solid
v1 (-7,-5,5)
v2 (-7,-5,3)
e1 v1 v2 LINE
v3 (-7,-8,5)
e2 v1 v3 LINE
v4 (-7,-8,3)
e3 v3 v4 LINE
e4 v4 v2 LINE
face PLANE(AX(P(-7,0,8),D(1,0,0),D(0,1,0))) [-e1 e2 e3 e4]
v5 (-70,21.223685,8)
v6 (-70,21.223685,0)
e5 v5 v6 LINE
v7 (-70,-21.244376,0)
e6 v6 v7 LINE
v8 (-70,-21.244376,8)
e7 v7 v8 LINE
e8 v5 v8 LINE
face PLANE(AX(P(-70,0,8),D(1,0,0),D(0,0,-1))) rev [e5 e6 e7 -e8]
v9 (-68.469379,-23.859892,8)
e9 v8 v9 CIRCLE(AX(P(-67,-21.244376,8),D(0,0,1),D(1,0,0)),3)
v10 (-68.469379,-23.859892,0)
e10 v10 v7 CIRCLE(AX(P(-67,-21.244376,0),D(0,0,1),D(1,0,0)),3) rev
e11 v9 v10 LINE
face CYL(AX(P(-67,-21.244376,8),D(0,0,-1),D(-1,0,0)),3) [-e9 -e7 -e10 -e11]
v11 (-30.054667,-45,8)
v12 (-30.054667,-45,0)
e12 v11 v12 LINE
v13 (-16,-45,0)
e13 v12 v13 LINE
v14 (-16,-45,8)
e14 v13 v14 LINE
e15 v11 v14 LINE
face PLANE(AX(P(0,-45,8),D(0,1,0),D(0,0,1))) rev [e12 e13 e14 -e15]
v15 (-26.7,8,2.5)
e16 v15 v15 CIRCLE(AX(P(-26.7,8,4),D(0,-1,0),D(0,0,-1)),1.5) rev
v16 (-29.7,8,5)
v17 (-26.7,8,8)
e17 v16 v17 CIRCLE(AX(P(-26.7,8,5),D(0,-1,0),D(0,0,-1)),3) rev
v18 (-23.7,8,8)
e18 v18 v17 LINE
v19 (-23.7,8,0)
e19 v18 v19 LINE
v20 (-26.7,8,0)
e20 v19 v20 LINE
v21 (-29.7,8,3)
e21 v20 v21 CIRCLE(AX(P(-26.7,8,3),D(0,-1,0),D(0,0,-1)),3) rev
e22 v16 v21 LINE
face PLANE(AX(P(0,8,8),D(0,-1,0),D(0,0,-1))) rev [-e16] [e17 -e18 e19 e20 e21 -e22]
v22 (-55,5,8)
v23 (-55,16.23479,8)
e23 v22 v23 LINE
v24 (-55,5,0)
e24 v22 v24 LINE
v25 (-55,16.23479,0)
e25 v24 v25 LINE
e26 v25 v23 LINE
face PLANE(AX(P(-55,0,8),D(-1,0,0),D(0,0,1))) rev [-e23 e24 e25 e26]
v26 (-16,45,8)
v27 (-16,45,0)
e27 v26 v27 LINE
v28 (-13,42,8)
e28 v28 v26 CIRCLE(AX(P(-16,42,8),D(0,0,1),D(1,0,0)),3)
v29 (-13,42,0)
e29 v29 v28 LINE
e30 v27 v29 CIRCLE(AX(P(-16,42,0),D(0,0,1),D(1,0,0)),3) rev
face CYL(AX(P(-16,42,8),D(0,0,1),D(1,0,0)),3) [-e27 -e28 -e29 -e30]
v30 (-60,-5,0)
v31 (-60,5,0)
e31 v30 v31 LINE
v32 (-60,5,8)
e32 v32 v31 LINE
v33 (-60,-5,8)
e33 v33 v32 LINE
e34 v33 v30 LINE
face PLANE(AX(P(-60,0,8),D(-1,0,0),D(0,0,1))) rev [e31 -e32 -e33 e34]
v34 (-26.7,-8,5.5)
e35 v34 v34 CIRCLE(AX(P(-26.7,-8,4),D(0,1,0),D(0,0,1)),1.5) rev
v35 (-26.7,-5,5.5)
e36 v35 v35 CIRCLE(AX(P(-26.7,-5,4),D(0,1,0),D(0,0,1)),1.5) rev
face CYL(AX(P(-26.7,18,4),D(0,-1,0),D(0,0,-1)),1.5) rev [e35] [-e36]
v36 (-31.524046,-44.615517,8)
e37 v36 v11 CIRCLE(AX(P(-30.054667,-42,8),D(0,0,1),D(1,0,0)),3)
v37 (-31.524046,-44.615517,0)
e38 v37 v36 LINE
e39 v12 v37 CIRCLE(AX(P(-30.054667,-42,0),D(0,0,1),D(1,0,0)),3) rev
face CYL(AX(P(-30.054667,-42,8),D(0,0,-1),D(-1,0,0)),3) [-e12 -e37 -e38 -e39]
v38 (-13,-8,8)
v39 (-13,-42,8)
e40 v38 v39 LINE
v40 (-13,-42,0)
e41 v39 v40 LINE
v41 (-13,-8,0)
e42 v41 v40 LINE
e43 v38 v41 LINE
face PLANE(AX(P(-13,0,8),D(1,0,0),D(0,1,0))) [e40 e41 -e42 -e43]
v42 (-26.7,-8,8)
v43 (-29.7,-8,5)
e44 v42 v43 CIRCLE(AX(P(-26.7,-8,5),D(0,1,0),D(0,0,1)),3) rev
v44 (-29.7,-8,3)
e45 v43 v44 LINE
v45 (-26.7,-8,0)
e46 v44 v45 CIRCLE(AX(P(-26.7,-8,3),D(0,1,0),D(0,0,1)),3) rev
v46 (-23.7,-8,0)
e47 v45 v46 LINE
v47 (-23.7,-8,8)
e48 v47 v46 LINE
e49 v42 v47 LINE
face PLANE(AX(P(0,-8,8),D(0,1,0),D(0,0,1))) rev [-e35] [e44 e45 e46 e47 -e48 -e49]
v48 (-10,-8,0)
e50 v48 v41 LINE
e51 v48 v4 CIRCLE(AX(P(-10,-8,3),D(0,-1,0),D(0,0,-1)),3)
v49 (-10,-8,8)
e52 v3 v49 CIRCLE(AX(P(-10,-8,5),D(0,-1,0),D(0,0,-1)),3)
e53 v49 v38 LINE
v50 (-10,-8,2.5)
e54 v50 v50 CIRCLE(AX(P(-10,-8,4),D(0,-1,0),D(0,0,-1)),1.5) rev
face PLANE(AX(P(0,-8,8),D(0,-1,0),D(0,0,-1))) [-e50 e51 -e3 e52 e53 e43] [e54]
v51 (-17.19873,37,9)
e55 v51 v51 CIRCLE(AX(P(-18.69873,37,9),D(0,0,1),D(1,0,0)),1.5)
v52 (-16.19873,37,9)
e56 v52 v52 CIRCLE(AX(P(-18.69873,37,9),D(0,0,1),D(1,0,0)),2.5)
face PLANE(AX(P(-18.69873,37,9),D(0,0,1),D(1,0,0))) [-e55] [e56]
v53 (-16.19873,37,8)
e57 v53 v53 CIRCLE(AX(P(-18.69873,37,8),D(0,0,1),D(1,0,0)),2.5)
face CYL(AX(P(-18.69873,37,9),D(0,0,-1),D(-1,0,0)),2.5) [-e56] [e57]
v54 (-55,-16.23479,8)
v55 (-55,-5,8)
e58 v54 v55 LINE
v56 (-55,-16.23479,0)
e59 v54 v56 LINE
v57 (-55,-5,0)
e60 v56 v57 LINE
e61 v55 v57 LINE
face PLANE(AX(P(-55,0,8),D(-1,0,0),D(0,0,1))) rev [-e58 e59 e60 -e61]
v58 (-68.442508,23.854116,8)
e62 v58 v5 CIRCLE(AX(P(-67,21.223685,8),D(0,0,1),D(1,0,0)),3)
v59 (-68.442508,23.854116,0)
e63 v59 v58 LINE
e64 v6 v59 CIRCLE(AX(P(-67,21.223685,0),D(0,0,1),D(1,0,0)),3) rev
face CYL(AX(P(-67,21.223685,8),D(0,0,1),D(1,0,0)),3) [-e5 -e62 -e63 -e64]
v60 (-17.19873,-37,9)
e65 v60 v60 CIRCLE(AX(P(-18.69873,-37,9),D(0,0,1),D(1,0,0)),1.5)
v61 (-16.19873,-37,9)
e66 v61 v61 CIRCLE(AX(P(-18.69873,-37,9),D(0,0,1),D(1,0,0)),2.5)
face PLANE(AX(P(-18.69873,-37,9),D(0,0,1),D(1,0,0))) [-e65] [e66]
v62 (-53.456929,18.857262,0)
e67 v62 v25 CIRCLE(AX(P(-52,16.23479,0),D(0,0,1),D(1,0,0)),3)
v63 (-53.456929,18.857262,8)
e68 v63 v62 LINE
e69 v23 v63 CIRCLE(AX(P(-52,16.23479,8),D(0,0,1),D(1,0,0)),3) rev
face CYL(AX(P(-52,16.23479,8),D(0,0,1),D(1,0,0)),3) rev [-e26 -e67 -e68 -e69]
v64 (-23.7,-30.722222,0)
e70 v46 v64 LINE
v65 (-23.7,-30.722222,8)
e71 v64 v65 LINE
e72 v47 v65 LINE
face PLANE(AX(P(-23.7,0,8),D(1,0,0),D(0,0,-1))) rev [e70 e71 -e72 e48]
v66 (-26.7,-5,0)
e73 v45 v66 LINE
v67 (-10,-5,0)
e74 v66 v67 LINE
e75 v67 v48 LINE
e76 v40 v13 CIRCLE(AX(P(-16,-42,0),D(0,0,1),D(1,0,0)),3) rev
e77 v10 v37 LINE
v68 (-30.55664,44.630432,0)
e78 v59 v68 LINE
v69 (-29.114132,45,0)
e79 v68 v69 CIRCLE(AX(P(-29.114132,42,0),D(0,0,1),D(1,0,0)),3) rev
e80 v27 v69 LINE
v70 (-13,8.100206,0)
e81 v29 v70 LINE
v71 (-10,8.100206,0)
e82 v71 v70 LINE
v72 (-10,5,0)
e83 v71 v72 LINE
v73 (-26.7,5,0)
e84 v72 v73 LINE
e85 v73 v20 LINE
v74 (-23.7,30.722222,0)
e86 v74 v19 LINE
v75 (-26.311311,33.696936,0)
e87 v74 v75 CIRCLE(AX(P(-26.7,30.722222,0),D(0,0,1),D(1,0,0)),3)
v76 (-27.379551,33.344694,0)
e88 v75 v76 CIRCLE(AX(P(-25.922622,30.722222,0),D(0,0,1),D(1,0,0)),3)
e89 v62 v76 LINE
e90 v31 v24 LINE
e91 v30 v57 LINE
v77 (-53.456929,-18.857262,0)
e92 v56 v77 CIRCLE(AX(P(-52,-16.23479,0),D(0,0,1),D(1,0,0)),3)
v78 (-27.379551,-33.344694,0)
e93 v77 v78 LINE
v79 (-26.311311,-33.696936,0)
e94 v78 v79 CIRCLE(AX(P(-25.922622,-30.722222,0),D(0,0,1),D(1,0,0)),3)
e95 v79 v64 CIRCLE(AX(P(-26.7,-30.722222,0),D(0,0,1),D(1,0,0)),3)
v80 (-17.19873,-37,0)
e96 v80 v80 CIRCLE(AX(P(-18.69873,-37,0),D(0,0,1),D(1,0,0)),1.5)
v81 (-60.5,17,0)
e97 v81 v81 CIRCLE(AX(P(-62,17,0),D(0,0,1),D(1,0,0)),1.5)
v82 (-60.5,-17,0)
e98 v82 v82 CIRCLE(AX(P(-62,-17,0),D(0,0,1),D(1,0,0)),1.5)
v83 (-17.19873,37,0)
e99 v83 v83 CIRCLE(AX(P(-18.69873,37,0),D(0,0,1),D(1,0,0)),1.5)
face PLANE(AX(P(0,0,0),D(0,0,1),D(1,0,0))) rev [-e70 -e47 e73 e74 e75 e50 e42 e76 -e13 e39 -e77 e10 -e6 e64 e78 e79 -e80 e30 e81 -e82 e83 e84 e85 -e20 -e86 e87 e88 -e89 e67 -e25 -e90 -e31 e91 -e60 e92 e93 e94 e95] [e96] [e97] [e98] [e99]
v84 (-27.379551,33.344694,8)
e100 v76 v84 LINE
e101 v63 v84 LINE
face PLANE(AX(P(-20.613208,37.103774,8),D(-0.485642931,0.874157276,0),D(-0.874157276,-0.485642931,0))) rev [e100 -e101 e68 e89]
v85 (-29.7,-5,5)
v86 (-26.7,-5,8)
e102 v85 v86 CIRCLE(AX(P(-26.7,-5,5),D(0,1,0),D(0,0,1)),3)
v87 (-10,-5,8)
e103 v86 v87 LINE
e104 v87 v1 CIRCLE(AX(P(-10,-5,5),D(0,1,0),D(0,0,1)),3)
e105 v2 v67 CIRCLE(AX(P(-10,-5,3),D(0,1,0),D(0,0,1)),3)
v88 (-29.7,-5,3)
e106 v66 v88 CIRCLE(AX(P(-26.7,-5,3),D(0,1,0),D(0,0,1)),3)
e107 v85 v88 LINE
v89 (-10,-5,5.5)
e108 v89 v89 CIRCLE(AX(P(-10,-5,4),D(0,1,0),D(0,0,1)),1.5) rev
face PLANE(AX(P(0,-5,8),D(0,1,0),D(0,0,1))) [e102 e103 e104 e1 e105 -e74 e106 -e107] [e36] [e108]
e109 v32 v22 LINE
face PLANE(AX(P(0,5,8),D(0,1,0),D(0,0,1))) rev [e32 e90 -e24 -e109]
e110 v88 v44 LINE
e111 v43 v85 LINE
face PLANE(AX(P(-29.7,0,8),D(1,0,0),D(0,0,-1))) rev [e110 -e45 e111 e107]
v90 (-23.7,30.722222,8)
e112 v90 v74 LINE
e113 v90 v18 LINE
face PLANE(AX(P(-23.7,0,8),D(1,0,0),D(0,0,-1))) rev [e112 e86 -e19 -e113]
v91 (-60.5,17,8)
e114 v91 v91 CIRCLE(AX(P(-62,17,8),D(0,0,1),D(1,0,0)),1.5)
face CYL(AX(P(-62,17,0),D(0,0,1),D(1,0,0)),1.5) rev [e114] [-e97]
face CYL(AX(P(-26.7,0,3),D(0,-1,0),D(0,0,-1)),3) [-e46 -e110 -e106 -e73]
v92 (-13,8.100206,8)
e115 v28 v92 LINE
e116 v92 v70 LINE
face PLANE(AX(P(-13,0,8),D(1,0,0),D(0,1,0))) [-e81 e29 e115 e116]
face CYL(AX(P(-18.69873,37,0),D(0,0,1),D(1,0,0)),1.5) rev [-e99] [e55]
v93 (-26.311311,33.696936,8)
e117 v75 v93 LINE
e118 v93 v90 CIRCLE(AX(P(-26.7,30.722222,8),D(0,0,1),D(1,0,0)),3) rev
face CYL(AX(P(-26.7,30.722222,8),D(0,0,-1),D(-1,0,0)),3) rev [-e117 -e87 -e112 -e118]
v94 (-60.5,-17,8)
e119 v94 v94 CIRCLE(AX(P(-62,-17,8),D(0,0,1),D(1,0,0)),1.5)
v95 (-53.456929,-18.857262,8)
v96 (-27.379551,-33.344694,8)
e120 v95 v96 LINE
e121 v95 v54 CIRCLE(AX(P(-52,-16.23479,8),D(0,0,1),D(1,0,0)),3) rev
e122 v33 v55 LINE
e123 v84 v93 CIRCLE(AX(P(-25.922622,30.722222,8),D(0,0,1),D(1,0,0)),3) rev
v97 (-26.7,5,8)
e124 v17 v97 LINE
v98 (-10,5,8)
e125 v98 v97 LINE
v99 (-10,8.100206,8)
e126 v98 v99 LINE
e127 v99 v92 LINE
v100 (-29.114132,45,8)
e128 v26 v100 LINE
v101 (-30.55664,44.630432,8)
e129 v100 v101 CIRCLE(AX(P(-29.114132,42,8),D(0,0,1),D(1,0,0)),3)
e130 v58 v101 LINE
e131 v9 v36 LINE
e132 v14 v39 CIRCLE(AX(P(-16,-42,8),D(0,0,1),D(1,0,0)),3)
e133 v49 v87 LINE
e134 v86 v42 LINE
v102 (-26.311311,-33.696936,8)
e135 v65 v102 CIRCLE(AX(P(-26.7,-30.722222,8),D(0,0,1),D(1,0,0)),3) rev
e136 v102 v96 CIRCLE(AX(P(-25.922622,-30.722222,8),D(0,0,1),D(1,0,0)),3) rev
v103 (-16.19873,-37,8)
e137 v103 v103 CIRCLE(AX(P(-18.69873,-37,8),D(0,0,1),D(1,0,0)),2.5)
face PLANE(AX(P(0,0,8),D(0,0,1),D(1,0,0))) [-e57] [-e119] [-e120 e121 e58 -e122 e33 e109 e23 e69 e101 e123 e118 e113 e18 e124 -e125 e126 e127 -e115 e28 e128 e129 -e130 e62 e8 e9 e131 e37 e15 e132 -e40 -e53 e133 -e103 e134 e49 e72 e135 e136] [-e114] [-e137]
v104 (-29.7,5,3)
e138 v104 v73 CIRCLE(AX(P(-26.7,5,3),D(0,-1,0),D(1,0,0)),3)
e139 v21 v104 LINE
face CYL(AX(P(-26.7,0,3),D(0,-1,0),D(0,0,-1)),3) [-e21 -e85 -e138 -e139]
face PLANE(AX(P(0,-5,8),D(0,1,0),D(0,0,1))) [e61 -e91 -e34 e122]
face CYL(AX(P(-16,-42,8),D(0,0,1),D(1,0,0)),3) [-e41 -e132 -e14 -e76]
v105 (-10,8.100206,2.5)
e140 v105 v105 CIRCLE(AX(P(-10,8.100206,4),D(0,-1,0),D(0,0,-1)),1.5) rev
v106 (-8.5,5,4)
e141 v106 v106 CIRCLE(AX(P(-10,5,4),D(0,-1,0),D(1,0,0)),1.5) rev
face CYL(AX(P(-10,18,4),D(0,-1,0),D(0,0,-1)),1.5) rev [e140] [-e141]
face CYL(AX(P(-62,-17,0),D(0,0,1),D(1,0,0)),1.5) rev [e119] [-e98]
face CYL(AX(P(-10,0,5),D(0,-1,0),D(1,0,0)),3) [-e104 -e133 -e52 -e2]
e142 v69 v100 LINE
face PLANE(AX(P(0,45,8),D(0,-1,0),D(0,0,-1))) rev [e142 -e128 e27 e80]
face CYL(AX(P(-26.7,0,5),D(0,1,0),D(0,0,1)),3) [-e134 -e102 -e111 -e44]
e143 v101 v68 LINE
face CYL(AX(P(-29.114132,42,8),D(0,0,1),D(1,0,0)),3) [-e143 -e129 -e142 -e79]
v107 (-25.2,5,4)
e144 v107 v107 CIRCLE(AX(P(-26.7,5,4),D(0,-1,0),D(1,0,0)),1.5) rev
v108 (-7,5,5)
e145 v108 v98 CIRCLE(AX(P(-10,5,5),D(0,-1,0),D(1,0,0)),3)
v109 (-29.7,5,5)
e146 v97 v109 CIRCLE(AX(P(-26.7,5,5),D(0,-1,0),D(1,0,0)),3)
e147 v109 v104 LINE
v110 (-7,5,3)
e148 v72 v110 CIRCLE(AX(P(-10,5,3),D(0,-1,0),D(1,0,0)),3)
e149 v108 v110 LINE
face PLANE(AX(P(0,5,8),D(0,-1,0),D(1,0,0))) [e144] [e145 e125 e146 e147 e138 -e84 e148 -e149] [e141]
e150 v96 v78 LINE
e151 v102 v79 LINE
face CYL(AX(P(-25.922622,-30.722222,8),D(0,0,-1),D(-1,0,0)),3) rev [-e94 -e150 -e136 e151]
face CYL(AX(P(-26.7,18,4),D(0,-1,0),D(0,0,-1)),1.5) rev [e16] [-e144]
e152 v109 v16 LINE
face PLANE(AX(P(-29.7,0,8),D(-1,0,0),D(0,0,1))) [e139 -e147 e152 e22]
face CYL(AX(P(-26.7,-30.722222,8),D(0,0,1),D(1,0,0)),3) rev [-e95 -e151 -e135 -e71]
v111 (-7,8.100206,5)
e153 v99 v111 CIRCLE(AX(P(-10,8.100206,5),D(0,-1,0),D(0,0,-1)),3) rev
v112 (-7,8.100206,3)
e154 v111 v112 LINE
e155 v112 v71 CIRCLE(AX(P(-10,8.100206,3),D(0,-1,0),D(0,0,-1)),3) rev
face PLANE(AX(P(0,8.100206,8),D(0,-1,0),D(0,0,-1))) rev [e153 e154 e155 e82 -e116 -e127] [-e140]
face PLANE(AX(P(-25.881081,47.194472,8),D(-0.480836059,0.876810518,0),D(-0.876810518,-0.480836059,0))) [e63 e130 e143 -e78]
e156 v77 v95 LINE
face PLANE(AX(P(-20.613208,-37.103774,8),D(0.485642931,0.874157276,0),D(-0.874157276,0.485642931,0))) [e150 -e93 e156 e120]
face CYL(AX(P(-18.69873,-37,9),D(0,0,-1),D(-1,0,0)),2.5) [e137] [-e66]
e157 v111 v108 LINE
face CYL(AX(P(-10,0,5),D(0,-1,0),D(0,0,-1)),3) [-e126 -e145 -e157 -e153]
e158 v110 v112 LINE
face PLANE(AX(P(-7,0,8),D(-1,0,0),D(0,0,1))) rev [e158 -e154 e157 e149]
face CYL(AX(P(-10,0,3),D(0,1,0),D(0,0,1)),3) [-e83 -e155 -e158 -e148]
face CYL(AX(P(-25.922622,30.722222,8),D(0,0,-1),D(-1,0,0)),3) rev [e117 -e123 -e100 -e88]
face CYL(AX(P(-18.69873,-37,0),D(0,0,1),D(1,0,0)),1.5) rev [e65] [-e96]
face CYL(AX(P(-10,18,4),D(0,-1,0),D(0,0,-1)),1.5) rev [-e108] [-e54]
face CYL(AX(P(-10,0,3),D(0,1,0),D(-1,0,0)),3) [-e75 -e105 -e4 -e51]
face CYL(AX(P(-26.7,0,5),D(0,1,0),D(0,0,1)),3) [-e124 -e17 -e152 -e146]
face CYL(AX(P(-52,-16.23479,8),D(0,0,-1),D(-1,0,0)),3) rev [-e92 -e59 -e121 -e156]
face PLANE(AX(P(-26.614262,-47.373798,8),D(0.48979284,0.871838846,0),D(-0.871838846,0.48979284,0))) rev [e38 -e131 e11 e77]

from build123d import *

# Parameters (mm, degrees)
EXTRUDE_1_DEPTH          = 8
SKETCH_2_R               = 1.5
CUT_EXTRUDE_1_DEPTH      = 84.600239234
EXTRUDE_START            = 1
SKETCH_7_R               = 2.5
SKETCH_7_R_2             = 1.5
EXTRUDE_5_DEPTH          = 1
CUT_EXTRUDE_2_DEPTH      = 10
CUT_EXTRUDE_2_DEPTH_BACK = 20
SKETCH_8_R               = 1.5
FILLET_1_R               = 3
FILLET_2_R               = 3


with BuildPart() as part:
    # 草图1 → 凸台-拉伸1 (new body)
    with BuildSketch(Plane.XY):
        Polygon((-29.882727096, 45), (-70, 23), (-70, 5), (-70, -5), (-70, -23), (-30.839658999, -45), (-13, -45), (-13, -8), (-7, -8), (-7, -5), (-13.8744125, -5), (-23.7, -5), (-29.7, -5), (-29.7, -8), (-23.7, -8), (-23.7, -33.722222222), (-26.7, -33.722222222), (-55, -18), (-55, -10), (-55, -5), (-60, -5), (-60, 5), (-55, 5), (-55, 10), (-55, 18), (-26.7, 33.722222222), (-23.7, 33.722222222), (-23.7, 8), (-29.7, 8), (-29.7, 5), (-23.7, 5), (-13.8744125, 5), (-7, 5), (-7, 8.100206116), (-13, 8.100206116), (-13, 45), (-13.841189827, 45), align=None)
    extrude(amount=EXTRUDE_1_DEPTH)

    # 草图2 → 切除-拉伸1 (cut, through all)
    with BuildSketch(Plane.XY.offset(8)):
        with Locations((-62, 17)):
            Circle(SKETCH_2_R)
        with Locations((-62, -17)):
            Circle(SKETCH_2_R)
        with Locations((-18.698729811, 37)):
            Circle(SKETCH_2_R)
        with Locations((-18.698729811, -37)):
            Circle(SKETCH_2_R)
    extrude(amount=-CUT_EXTRUDE_1_DEPTH, mode=Mode.SUBTRACT)

    # 草图7 → 凸台-拉伸5 (add)
    # profile 1 of 2: a face of its own
    with BuildSketch(Plane.XY.offset(8).offset(EXTRUDE_START)):
        with Locations((-18.698729811, 37)):
            Circle(SKETCH_7_R)
        with Locations((-18.698729811, 37)):
            Circle(SKETCH_7_R_2, mode=Mode.SUBTRACT)
    # profile 2 of 2: a face of its own
    with BuildSketch(Plane.XY.offset(8).offset(EXTRUDE_START)):
        with Locations((-18.698729811, -37)):
            Circle(SKETCH_7_R)
        with Locations((-18.698729811, -37)):
            Circle(SKETCH_7_R_2, mode=Mode.SUBTRACT)
    extrude(amount=-EXTRUDE_5_DEPTH)

    # 草图8 → 切除-拉伸2 (cut, two sides: drawn at the far end of the back side and taken through both)
    with BuildSketch(Plane(origin=(0, 8, 0), x_dir=(1, 0, 0), z_dir=(0, 1, 0)).offset(-CUT_EXTRUDE_2_DEPTH_BACK)):
        with Locations(Location((-26.7, -4, 0), (0, 0, 90))):
            Circle(SKETCH_8_R)
        with Locations(Location((-10, -4, 0), (0, 0, 90))):
            Circle(SKETCH_8_R)
    extrude(amount=CUT_EXTRUDE_2_DEPTH + CUT_EXTRUDE_2_DEPTH_BACK, mode=Mode.SUBTRACT)

    # 圆角1
    # the kernel refuses this fillet: 3 mm, written as the material it adds along each edge
    with BuildSketch(Plane(origin=(-55, -18, 0), x_dir=(0.8741572761215378, -0.4856429311786321, 0), z_dir=(0, 0, 1))) as fillet_1_piece_1:
        with BuildLine():
            CenterArc((FILLET_1_R * 0.588403348999, FILLET_1_R), FILLET_1_R, 209.054604099, 60.945395901)
            Line((-FILLET_1_R * 0.285753927123, FILLET_1_R * 0.514357068821), (0, 0))
            Line((0, 0), (FILLET_1_R * 0.588403348999, 0))
        make_face()
    extrude(amount=8)
    with BuildSketch(Plane(origin=(-55, 18, 0), x_dir=(0.8741572761215377, 0.4856429311786323, 0), z_dir=(0, 0, 1))) as fillet_1_piece_2:
        with BuildLine():
            CenterArc((FILLET_1_R * 0.588403348999, -FILLET_1_R), FILLET_1_R, 90, 60.945395901)
            Line((-FILLET_1_R * 0.285753927123, -FILLET_1_R * 0.514357068821), (0, 0))
            Line((0, 0), (FILLET_1_R * 0.588403348999, 0))
        make_face()
    extrude(amount=8)
    with BuildSketch(Plane(origin=(-26.7, -33.722222222, 0), x_dir=(1, 0, 0), z_dir=(0, 0, 1))) as fillet_1_piece_3:
        with BuildLine():
            CenterArc((FILLET_1_R * 0.259126028197, FILLET_1_R), FILLET_1_R, 240.945395901, 29.054604099)
            Line((-FILLET_1_R * 0.226516902981, FILLET_1_R * 0.125842723878), (0, 0))
            Line((0, 0), (FILLET_1_R * 0.259126028197, 0))
        make_face()
    extrude(amount=8)
    with BuildSketch(Plane(origin=(-23.7, -33.722222222, 0), x_dir=(0, 1, 0), z_dir=(0, 0, 1))) as fillet_1_piece_4:
        with BuildLine():
            CenterArc((FILLET_1_R, FILLET_1_R), FILLET_1_R, 180, 90)
            Line((0, FILLET_1_R), (0, 0))
            Line((0, 0), (FILLET_1_R, 0))
        make_face()
    extrude(amount=8)
    with BuildSketch(Plane(origin=(-26.7, 33.722222222, 0), x_dir=(1, 0, 0), z_dir=(0, 0, 1))) as fillet_1_piece_5:
        with BuildLine():
            CenterArc((FILLET_1_R * 0.259126028197, -FILLET_1_R), FILLET_1_R, 90, 29.054604099)
            Line((-FILLET_1_R * 0.226516902981, -FILLET_1_R * 0.125842723878), (0, 0))
            Line((0, 0), (FILLET_1_R * 0.259126028197, 0))
        make_face()
    extrude(amount=8)
    with BuildSketch(Plane(origin=(-23.7, 33.722222222, 0), x_dir=(0, -1, 0), z_dir=(0, 0, 1))) as fillet_1_piece_6:
        with BuildLine():
            CenterArc((FILLET_1_R, -FILLET_1_R), FILLET_1_R, 90, 90)
            Line((0, -FILLET_1_R), (0, 0))
            Line((0, 0), (FILLET_1_R, 0))
        make_face()
    extrude(amount=8)
    # the kernel refuses this fillet: 3 mm, written as the material it takes off along each edge
    with BuildSketch(Plane(origin=(-13, 45, -7.5), x_dir=(-1, 0, 0), z_dir=(0, 0, 1))) as fillet_1_2_piece_1:
        with BuildLine():
            CenterArc((FILLET_1_R, FILLET_1_R), FILLET_1_R, 180, 90)
            Line((0, FILLET_1_R), (0, 0))
            Line((0, 0), (FILLET_1_R, 0))
        make_face()
    extrude(amount=23, mode=Mode.SUBTRACT)
    with BuildSketch(Plane(origin=(-29.882727096, 45, -1.921488827), x_dir=(-0.8768105180064049, -0.48083605887385356, 0), z_dir=(0, 0, 1))) as fillet_1_2_piece_2:
        with BuildLine():
            CenterArc((FILLET_1_R * 0.256198510324, FILLET_1_R), FILLET_1_R, 241.259979418, 28.740020582)
            Line((-FILLET_1_R * 0.22463754855, FILLET_1_R * 0.123189481994), (0, 0))
            Line((0, 0), (FILLET_1_R * 0.256198510324, 0))
        make_face()
    extrude(amount=11.842977655, mode=Mode.SUBTRACT)
    with BuildSketch(Plane(origin=(-13, -45, -7.5), x_dir=(-1, 0, 0), z_dir=(0, 0, 1))) as fillet_1_2_piece_3:
        with BuildLine():
            CenterArc((FILLET_1_R, -FILLET_1_R), FILLET_1_R, 90, 90)
            Line((0, -FILLET_1_R), (0, 0))
            Line((0, 0), (FILLET_1_R, 0))
        make_face()
    extrude(amount=23, mode=Mode.SUBTRACT)
    with BuildSketch(Plane(origin=(-30.839658999, -45, -1.962479999), x_dir=(-0.8718388464587432, 0.4897928396837667, 0), z_dir=(0, 0, 1))) as fillet_1_2_piece_4:
        with BuildLine():
            CenterArc((FILLET_1_R * 0.261663999874, -FILLET_1_R), FILLET_1_R, 90, 29.326966439)
            Line((-FILLET_1_R * 0.22812883981, -FILLET_1_R * 0.128161153541), (0, 0))
            Line((0, 0), (FILLET_1_R * 0.261663999874, 0))
        make_face()
    extrude(amount=11.924959998, mode=Mode.SUBTRACT)
    with BuildSketch(Plane(origin=(-70, -23, -4.389060797), x_dir=(0, 1, 0), z_dir=(0, 0, 1))) as fillet_1_2_piece_5:
        with BuildLine():
            CenterArc((FILLET_1_R * 0.585208106279, -FILLET_1_R), FILLET_1_R, 90, 60.673033561)
            Line((-FILLET_1_R * 0.28663074018, -FILLET_1_R * 0.510207160316), (0, 0))
            Line((0, 0), (FILLET_1_R * 0.585208106279, 0))
        make_face()
    extrude(amount=16.778121594, mode=Mode.SUBTRACT)
    with BuildSketch(Plane(origin=(-70, 23, -4.440787922), x_dir=(0.8768105180064074, 0.48083605887384884, 0), z_dir=(0, 0, 1))) as fillet_1_2_piece_6:
        with BuildLine():
            CenterArc((FILLET_1_R * 0.592105056297, -FILLET_1_R), FILLET_1_R, 90, 61.259979418)
            Line((-FILLET_1_R * 0.284705461709, -FILLET_1_R * 0.519163941126), (0, 0))
            Line((0, 0), (FILLET_1_R * 0.592105056297, 0))
        make_face()
    extrude(amount=16.881575844, mode=Mode.SUBTRACT)

    # 圆角2
    fillet_2_edges = [part.edges().sort_by_distance(p)[0] for p in [
        (-29.7, 6.5, 8),
        (-7, 6.550103058, 8),
        (-7, -6.5, 8),
        (-29.7, -6.5, 8),
        (-7, 6.550103058, 0),
        (-29.7, 6.5, 0),
        (-29.7, -6.5, 0),
        (-7, -6.5, 0),
    ]]
    fillet(fillet_2_edges, radius=FILLET_2_R)


solid = part.part
